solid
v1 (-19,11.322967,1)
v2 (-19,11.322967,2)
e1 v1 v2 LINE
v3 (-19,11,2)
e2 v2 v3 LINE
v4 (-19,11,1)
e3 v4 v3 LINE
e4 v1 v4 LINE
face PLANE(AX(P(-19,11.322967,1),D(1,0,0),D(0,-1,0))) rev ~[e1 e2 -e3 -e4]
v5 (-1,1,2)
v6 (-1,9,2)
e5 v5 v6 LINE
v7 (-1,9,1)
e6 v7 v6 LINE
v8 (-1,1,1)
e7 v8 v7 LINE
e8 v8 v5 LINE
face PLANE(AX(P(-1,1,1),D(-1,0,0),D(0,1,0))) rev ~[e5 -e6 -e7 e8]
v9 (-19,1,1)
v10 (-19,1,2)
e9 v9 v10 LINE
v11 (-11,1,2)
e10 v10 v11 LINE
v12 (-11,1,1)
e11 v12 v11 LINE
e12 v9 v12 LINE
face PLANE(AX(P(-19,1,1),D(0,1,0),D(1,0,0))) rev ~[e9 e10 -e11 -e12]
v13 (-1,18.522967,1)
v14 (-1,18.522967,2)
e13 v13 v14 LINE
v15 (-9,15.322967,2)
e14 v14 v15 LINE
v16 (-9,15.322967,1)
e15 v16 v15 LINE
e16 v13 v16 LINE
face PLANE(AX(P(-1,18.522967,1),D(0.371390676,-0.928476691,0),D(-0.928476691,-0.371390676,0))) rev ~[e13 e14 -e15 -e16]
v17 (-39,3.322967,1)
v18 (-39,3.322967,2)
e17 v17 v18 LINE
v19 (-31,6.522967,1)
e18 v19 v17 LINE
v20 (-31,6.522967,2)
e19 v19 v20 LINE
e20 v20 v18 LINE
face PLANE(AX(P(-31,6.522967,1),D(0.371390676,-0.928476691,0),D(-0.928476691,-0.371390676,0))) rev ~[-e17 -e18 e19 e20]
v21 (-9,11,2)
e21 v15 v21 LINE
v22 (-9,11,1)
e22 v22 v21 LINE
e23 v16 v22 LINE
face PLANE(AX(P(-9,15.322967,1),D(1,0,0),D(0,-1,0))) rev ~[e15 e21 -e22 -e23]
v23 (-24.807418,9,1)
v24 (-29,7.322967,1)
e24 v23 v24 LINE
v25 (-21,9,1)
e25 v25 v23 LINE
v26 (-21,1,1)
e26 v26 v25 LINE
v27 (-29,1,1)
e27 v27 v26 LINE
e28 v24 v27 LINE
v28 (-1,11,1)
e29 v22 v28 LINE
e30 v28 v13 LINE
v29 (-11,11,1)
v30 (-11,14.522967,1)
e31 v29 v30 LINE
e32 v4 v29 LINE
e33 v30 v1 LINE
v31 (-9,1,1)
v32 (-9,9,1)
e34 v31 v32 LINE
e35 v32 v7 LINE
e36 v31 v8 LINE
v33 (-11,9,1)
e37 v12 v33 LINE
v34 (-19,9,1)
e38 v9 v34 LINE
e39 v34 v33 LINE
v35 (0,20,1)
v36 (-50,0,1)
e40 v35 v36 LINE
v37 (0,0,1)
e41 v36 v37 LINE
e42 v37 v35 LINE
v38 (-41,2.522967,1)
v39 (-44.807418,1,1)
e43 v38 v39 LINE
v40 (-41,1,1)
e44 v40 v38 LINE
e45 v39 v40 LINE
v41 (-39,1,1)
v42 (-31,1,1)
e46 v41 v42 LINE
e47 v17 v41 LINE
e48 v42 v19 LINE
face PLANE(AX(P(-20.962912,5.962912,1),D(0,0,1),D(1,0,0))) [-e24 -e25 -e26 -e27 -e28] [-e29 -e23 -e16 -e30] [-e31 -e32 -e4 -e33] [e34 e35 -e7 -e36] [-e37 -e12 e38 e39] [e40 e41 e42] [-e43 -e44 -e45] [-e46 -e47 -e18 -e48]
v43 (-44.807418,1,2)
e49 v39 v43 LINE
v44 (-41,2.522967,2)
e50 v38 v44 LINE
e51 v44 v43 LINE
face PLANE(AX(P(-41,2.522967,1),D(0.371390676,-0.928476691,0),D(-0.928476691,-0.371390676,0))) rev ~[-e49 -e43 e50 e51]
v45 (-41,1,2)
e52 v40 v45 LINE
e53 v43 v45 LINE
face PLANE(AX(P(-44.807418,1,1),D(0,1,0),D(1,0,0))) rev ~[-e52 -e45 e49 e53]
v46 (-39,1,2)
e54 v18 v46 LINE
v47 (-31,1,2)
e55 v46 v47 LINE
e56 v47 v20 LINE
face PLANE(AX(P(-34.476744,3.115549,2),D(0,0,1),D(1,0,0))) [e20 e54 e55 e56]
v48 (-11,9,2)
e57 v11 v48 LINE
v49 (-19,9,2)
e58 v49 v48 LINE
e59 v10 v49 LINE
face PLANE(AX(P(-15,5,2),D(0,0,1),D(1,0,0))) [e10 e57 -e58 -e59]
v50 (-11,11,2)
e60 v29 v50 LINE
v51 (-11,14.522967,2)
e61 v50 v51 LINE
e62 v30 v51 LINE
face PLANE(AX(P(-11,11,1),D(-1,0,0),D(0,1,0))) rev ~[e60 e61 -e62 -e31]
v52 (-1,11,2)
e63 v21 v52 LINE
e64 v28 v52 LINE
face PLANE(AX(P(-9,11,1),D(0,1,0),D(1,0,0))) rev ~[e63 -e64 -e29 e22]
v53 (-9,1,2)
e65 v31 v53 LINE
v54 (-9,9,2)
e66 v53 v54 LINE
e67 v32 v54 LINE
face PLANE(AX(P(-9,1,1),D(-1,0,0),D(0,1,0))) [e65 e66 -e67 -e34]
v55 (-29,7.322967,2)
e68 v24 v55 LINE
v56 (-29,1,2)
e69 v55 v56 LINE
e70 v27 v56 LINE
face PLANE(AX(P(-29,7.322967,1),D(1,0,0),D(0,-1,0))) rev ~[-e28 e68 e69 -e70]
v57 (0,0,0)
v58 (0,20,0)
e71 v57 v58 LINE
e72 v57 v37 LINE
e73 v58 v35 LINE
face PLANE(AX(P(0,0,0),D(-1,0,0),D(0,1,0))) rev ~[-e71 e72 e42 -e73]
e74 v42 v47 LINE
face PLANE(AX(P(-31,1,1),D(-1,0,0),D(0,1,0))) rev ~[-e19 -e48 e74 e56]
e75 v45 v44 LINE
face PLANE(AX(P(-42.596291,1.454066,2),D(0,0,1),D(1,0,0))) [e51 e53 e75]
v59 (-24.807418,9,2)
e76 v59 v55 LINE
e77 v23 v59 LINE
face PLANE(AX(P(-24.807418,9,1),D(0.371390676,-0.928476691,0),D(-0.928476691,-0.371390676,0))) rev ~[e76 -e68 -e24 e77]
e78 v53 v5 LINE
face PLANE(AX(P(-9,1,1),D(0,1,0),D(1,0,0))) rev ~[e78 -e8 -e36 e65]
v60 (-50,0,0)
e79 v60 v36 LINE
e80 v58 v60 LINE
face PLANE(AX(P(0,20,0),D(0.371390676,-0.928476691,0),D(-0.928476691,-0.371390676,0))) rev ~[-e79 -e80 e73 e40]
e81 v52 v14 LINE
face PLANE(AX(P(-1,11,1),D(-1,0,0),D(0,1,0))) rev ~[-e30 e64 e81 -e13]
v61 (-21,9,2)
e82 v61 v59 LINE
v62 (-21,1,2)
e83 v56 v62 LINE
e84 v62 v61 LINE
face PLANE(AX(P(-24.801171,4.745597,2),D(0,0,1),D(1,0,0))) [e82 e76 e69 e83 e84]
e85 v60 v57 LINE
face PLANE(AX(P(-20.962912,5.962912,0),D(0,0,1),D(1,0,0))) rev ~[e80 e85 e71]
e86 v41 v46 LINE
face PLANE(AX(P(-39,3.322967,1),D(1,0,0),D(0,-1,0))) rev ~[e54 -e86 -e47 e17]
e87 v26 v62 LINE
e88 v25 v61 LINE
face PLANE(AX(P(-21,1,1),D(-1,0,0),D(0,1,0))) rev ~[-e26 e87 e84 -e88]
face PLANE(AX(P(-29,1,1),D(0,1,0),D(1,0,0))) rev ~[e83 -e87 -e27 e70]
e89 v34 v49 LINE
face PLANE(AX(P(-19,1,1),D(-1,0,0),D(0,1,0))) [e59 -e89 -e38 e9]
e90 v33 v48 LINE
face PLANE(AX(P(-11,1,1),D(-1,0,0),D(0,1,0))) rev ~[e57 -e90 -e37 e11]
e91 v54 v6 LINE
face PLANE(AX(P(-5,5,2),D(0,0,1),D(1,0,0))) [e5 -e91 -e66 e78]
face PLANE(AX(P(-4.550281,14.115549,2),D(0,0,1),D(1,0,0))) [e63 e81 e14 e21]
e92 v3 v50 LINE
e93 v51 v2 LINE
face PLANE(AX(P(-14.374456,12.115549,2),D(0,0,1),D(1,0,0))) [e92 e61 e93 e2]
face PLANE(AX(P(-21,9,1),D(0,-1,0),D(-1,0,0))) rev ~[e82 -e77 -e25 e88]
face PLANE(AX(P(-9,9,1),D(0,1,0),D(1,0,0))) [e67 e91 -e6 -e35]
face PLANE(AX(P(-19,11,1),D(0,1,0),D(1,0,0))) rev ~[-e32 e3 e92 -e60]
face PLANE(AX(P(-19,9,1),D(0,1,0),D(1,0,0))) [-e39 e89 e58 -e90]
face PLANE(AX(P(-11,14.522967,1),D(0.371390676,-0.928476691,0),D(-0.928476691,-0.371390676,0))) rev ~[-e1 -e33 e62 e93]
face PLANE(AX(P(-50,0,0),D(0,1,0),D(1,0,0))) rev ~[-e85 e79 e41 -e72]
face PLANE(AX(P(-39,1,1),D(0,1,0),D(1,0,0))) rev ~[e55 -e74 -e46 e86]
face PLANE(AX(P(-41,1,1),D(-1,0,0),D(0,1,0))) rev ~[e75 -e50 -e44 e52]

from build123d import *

# Parameters (mm, degrees)
F1_DEPTH = 1
F2_W     = 8
F2_H     = 8
F3_DEPTH = 1


# Not quite as in the source:
# - a feature names something its author has since deleted; it is built from what else it names


with BuildPart() as f1:
    # F0 (on Top) → F1 (new body)
    with BuildSketch(Plane.XY):
        Polygon((0, 20), (-50, 0), (0, 0), align=None)
    extrude(amount=F1_DEPTH)

    # F2 (on face) → F3 (join)
    with BuildSketch(Plane.XY.offset(1)):
        Polygon((-19, 11.3229670386), (-19, 11), (-11, 11), (-11, 14.5229670386), align=None)
        Polygon((-29, 7.3229670386), (-29, 1), (-21, 1), (-21, 9), (-24.8074175964, 9), align=None)
        Polygon((-39, 3.3229670386), (-39, 1), (-31, 1), (-31, 6.5229670386), align=None)
        Polygon((-9, 15.3229670386), (-9, 11), (-1, 11), (-1, 18.5229670386), align=None)
        with Locations((-5, 5)):
            Rectangle(F2_W, F2_H)
        with Locations((-15, 5)):
            Rectangle(F2_W, F2_H)
        Polygon((-41, 2.5229670386), (-44.8074175964, 1), (-41, 1), align=None)
    extrude(amount=F3_DEPTH)


solid = f1.part
